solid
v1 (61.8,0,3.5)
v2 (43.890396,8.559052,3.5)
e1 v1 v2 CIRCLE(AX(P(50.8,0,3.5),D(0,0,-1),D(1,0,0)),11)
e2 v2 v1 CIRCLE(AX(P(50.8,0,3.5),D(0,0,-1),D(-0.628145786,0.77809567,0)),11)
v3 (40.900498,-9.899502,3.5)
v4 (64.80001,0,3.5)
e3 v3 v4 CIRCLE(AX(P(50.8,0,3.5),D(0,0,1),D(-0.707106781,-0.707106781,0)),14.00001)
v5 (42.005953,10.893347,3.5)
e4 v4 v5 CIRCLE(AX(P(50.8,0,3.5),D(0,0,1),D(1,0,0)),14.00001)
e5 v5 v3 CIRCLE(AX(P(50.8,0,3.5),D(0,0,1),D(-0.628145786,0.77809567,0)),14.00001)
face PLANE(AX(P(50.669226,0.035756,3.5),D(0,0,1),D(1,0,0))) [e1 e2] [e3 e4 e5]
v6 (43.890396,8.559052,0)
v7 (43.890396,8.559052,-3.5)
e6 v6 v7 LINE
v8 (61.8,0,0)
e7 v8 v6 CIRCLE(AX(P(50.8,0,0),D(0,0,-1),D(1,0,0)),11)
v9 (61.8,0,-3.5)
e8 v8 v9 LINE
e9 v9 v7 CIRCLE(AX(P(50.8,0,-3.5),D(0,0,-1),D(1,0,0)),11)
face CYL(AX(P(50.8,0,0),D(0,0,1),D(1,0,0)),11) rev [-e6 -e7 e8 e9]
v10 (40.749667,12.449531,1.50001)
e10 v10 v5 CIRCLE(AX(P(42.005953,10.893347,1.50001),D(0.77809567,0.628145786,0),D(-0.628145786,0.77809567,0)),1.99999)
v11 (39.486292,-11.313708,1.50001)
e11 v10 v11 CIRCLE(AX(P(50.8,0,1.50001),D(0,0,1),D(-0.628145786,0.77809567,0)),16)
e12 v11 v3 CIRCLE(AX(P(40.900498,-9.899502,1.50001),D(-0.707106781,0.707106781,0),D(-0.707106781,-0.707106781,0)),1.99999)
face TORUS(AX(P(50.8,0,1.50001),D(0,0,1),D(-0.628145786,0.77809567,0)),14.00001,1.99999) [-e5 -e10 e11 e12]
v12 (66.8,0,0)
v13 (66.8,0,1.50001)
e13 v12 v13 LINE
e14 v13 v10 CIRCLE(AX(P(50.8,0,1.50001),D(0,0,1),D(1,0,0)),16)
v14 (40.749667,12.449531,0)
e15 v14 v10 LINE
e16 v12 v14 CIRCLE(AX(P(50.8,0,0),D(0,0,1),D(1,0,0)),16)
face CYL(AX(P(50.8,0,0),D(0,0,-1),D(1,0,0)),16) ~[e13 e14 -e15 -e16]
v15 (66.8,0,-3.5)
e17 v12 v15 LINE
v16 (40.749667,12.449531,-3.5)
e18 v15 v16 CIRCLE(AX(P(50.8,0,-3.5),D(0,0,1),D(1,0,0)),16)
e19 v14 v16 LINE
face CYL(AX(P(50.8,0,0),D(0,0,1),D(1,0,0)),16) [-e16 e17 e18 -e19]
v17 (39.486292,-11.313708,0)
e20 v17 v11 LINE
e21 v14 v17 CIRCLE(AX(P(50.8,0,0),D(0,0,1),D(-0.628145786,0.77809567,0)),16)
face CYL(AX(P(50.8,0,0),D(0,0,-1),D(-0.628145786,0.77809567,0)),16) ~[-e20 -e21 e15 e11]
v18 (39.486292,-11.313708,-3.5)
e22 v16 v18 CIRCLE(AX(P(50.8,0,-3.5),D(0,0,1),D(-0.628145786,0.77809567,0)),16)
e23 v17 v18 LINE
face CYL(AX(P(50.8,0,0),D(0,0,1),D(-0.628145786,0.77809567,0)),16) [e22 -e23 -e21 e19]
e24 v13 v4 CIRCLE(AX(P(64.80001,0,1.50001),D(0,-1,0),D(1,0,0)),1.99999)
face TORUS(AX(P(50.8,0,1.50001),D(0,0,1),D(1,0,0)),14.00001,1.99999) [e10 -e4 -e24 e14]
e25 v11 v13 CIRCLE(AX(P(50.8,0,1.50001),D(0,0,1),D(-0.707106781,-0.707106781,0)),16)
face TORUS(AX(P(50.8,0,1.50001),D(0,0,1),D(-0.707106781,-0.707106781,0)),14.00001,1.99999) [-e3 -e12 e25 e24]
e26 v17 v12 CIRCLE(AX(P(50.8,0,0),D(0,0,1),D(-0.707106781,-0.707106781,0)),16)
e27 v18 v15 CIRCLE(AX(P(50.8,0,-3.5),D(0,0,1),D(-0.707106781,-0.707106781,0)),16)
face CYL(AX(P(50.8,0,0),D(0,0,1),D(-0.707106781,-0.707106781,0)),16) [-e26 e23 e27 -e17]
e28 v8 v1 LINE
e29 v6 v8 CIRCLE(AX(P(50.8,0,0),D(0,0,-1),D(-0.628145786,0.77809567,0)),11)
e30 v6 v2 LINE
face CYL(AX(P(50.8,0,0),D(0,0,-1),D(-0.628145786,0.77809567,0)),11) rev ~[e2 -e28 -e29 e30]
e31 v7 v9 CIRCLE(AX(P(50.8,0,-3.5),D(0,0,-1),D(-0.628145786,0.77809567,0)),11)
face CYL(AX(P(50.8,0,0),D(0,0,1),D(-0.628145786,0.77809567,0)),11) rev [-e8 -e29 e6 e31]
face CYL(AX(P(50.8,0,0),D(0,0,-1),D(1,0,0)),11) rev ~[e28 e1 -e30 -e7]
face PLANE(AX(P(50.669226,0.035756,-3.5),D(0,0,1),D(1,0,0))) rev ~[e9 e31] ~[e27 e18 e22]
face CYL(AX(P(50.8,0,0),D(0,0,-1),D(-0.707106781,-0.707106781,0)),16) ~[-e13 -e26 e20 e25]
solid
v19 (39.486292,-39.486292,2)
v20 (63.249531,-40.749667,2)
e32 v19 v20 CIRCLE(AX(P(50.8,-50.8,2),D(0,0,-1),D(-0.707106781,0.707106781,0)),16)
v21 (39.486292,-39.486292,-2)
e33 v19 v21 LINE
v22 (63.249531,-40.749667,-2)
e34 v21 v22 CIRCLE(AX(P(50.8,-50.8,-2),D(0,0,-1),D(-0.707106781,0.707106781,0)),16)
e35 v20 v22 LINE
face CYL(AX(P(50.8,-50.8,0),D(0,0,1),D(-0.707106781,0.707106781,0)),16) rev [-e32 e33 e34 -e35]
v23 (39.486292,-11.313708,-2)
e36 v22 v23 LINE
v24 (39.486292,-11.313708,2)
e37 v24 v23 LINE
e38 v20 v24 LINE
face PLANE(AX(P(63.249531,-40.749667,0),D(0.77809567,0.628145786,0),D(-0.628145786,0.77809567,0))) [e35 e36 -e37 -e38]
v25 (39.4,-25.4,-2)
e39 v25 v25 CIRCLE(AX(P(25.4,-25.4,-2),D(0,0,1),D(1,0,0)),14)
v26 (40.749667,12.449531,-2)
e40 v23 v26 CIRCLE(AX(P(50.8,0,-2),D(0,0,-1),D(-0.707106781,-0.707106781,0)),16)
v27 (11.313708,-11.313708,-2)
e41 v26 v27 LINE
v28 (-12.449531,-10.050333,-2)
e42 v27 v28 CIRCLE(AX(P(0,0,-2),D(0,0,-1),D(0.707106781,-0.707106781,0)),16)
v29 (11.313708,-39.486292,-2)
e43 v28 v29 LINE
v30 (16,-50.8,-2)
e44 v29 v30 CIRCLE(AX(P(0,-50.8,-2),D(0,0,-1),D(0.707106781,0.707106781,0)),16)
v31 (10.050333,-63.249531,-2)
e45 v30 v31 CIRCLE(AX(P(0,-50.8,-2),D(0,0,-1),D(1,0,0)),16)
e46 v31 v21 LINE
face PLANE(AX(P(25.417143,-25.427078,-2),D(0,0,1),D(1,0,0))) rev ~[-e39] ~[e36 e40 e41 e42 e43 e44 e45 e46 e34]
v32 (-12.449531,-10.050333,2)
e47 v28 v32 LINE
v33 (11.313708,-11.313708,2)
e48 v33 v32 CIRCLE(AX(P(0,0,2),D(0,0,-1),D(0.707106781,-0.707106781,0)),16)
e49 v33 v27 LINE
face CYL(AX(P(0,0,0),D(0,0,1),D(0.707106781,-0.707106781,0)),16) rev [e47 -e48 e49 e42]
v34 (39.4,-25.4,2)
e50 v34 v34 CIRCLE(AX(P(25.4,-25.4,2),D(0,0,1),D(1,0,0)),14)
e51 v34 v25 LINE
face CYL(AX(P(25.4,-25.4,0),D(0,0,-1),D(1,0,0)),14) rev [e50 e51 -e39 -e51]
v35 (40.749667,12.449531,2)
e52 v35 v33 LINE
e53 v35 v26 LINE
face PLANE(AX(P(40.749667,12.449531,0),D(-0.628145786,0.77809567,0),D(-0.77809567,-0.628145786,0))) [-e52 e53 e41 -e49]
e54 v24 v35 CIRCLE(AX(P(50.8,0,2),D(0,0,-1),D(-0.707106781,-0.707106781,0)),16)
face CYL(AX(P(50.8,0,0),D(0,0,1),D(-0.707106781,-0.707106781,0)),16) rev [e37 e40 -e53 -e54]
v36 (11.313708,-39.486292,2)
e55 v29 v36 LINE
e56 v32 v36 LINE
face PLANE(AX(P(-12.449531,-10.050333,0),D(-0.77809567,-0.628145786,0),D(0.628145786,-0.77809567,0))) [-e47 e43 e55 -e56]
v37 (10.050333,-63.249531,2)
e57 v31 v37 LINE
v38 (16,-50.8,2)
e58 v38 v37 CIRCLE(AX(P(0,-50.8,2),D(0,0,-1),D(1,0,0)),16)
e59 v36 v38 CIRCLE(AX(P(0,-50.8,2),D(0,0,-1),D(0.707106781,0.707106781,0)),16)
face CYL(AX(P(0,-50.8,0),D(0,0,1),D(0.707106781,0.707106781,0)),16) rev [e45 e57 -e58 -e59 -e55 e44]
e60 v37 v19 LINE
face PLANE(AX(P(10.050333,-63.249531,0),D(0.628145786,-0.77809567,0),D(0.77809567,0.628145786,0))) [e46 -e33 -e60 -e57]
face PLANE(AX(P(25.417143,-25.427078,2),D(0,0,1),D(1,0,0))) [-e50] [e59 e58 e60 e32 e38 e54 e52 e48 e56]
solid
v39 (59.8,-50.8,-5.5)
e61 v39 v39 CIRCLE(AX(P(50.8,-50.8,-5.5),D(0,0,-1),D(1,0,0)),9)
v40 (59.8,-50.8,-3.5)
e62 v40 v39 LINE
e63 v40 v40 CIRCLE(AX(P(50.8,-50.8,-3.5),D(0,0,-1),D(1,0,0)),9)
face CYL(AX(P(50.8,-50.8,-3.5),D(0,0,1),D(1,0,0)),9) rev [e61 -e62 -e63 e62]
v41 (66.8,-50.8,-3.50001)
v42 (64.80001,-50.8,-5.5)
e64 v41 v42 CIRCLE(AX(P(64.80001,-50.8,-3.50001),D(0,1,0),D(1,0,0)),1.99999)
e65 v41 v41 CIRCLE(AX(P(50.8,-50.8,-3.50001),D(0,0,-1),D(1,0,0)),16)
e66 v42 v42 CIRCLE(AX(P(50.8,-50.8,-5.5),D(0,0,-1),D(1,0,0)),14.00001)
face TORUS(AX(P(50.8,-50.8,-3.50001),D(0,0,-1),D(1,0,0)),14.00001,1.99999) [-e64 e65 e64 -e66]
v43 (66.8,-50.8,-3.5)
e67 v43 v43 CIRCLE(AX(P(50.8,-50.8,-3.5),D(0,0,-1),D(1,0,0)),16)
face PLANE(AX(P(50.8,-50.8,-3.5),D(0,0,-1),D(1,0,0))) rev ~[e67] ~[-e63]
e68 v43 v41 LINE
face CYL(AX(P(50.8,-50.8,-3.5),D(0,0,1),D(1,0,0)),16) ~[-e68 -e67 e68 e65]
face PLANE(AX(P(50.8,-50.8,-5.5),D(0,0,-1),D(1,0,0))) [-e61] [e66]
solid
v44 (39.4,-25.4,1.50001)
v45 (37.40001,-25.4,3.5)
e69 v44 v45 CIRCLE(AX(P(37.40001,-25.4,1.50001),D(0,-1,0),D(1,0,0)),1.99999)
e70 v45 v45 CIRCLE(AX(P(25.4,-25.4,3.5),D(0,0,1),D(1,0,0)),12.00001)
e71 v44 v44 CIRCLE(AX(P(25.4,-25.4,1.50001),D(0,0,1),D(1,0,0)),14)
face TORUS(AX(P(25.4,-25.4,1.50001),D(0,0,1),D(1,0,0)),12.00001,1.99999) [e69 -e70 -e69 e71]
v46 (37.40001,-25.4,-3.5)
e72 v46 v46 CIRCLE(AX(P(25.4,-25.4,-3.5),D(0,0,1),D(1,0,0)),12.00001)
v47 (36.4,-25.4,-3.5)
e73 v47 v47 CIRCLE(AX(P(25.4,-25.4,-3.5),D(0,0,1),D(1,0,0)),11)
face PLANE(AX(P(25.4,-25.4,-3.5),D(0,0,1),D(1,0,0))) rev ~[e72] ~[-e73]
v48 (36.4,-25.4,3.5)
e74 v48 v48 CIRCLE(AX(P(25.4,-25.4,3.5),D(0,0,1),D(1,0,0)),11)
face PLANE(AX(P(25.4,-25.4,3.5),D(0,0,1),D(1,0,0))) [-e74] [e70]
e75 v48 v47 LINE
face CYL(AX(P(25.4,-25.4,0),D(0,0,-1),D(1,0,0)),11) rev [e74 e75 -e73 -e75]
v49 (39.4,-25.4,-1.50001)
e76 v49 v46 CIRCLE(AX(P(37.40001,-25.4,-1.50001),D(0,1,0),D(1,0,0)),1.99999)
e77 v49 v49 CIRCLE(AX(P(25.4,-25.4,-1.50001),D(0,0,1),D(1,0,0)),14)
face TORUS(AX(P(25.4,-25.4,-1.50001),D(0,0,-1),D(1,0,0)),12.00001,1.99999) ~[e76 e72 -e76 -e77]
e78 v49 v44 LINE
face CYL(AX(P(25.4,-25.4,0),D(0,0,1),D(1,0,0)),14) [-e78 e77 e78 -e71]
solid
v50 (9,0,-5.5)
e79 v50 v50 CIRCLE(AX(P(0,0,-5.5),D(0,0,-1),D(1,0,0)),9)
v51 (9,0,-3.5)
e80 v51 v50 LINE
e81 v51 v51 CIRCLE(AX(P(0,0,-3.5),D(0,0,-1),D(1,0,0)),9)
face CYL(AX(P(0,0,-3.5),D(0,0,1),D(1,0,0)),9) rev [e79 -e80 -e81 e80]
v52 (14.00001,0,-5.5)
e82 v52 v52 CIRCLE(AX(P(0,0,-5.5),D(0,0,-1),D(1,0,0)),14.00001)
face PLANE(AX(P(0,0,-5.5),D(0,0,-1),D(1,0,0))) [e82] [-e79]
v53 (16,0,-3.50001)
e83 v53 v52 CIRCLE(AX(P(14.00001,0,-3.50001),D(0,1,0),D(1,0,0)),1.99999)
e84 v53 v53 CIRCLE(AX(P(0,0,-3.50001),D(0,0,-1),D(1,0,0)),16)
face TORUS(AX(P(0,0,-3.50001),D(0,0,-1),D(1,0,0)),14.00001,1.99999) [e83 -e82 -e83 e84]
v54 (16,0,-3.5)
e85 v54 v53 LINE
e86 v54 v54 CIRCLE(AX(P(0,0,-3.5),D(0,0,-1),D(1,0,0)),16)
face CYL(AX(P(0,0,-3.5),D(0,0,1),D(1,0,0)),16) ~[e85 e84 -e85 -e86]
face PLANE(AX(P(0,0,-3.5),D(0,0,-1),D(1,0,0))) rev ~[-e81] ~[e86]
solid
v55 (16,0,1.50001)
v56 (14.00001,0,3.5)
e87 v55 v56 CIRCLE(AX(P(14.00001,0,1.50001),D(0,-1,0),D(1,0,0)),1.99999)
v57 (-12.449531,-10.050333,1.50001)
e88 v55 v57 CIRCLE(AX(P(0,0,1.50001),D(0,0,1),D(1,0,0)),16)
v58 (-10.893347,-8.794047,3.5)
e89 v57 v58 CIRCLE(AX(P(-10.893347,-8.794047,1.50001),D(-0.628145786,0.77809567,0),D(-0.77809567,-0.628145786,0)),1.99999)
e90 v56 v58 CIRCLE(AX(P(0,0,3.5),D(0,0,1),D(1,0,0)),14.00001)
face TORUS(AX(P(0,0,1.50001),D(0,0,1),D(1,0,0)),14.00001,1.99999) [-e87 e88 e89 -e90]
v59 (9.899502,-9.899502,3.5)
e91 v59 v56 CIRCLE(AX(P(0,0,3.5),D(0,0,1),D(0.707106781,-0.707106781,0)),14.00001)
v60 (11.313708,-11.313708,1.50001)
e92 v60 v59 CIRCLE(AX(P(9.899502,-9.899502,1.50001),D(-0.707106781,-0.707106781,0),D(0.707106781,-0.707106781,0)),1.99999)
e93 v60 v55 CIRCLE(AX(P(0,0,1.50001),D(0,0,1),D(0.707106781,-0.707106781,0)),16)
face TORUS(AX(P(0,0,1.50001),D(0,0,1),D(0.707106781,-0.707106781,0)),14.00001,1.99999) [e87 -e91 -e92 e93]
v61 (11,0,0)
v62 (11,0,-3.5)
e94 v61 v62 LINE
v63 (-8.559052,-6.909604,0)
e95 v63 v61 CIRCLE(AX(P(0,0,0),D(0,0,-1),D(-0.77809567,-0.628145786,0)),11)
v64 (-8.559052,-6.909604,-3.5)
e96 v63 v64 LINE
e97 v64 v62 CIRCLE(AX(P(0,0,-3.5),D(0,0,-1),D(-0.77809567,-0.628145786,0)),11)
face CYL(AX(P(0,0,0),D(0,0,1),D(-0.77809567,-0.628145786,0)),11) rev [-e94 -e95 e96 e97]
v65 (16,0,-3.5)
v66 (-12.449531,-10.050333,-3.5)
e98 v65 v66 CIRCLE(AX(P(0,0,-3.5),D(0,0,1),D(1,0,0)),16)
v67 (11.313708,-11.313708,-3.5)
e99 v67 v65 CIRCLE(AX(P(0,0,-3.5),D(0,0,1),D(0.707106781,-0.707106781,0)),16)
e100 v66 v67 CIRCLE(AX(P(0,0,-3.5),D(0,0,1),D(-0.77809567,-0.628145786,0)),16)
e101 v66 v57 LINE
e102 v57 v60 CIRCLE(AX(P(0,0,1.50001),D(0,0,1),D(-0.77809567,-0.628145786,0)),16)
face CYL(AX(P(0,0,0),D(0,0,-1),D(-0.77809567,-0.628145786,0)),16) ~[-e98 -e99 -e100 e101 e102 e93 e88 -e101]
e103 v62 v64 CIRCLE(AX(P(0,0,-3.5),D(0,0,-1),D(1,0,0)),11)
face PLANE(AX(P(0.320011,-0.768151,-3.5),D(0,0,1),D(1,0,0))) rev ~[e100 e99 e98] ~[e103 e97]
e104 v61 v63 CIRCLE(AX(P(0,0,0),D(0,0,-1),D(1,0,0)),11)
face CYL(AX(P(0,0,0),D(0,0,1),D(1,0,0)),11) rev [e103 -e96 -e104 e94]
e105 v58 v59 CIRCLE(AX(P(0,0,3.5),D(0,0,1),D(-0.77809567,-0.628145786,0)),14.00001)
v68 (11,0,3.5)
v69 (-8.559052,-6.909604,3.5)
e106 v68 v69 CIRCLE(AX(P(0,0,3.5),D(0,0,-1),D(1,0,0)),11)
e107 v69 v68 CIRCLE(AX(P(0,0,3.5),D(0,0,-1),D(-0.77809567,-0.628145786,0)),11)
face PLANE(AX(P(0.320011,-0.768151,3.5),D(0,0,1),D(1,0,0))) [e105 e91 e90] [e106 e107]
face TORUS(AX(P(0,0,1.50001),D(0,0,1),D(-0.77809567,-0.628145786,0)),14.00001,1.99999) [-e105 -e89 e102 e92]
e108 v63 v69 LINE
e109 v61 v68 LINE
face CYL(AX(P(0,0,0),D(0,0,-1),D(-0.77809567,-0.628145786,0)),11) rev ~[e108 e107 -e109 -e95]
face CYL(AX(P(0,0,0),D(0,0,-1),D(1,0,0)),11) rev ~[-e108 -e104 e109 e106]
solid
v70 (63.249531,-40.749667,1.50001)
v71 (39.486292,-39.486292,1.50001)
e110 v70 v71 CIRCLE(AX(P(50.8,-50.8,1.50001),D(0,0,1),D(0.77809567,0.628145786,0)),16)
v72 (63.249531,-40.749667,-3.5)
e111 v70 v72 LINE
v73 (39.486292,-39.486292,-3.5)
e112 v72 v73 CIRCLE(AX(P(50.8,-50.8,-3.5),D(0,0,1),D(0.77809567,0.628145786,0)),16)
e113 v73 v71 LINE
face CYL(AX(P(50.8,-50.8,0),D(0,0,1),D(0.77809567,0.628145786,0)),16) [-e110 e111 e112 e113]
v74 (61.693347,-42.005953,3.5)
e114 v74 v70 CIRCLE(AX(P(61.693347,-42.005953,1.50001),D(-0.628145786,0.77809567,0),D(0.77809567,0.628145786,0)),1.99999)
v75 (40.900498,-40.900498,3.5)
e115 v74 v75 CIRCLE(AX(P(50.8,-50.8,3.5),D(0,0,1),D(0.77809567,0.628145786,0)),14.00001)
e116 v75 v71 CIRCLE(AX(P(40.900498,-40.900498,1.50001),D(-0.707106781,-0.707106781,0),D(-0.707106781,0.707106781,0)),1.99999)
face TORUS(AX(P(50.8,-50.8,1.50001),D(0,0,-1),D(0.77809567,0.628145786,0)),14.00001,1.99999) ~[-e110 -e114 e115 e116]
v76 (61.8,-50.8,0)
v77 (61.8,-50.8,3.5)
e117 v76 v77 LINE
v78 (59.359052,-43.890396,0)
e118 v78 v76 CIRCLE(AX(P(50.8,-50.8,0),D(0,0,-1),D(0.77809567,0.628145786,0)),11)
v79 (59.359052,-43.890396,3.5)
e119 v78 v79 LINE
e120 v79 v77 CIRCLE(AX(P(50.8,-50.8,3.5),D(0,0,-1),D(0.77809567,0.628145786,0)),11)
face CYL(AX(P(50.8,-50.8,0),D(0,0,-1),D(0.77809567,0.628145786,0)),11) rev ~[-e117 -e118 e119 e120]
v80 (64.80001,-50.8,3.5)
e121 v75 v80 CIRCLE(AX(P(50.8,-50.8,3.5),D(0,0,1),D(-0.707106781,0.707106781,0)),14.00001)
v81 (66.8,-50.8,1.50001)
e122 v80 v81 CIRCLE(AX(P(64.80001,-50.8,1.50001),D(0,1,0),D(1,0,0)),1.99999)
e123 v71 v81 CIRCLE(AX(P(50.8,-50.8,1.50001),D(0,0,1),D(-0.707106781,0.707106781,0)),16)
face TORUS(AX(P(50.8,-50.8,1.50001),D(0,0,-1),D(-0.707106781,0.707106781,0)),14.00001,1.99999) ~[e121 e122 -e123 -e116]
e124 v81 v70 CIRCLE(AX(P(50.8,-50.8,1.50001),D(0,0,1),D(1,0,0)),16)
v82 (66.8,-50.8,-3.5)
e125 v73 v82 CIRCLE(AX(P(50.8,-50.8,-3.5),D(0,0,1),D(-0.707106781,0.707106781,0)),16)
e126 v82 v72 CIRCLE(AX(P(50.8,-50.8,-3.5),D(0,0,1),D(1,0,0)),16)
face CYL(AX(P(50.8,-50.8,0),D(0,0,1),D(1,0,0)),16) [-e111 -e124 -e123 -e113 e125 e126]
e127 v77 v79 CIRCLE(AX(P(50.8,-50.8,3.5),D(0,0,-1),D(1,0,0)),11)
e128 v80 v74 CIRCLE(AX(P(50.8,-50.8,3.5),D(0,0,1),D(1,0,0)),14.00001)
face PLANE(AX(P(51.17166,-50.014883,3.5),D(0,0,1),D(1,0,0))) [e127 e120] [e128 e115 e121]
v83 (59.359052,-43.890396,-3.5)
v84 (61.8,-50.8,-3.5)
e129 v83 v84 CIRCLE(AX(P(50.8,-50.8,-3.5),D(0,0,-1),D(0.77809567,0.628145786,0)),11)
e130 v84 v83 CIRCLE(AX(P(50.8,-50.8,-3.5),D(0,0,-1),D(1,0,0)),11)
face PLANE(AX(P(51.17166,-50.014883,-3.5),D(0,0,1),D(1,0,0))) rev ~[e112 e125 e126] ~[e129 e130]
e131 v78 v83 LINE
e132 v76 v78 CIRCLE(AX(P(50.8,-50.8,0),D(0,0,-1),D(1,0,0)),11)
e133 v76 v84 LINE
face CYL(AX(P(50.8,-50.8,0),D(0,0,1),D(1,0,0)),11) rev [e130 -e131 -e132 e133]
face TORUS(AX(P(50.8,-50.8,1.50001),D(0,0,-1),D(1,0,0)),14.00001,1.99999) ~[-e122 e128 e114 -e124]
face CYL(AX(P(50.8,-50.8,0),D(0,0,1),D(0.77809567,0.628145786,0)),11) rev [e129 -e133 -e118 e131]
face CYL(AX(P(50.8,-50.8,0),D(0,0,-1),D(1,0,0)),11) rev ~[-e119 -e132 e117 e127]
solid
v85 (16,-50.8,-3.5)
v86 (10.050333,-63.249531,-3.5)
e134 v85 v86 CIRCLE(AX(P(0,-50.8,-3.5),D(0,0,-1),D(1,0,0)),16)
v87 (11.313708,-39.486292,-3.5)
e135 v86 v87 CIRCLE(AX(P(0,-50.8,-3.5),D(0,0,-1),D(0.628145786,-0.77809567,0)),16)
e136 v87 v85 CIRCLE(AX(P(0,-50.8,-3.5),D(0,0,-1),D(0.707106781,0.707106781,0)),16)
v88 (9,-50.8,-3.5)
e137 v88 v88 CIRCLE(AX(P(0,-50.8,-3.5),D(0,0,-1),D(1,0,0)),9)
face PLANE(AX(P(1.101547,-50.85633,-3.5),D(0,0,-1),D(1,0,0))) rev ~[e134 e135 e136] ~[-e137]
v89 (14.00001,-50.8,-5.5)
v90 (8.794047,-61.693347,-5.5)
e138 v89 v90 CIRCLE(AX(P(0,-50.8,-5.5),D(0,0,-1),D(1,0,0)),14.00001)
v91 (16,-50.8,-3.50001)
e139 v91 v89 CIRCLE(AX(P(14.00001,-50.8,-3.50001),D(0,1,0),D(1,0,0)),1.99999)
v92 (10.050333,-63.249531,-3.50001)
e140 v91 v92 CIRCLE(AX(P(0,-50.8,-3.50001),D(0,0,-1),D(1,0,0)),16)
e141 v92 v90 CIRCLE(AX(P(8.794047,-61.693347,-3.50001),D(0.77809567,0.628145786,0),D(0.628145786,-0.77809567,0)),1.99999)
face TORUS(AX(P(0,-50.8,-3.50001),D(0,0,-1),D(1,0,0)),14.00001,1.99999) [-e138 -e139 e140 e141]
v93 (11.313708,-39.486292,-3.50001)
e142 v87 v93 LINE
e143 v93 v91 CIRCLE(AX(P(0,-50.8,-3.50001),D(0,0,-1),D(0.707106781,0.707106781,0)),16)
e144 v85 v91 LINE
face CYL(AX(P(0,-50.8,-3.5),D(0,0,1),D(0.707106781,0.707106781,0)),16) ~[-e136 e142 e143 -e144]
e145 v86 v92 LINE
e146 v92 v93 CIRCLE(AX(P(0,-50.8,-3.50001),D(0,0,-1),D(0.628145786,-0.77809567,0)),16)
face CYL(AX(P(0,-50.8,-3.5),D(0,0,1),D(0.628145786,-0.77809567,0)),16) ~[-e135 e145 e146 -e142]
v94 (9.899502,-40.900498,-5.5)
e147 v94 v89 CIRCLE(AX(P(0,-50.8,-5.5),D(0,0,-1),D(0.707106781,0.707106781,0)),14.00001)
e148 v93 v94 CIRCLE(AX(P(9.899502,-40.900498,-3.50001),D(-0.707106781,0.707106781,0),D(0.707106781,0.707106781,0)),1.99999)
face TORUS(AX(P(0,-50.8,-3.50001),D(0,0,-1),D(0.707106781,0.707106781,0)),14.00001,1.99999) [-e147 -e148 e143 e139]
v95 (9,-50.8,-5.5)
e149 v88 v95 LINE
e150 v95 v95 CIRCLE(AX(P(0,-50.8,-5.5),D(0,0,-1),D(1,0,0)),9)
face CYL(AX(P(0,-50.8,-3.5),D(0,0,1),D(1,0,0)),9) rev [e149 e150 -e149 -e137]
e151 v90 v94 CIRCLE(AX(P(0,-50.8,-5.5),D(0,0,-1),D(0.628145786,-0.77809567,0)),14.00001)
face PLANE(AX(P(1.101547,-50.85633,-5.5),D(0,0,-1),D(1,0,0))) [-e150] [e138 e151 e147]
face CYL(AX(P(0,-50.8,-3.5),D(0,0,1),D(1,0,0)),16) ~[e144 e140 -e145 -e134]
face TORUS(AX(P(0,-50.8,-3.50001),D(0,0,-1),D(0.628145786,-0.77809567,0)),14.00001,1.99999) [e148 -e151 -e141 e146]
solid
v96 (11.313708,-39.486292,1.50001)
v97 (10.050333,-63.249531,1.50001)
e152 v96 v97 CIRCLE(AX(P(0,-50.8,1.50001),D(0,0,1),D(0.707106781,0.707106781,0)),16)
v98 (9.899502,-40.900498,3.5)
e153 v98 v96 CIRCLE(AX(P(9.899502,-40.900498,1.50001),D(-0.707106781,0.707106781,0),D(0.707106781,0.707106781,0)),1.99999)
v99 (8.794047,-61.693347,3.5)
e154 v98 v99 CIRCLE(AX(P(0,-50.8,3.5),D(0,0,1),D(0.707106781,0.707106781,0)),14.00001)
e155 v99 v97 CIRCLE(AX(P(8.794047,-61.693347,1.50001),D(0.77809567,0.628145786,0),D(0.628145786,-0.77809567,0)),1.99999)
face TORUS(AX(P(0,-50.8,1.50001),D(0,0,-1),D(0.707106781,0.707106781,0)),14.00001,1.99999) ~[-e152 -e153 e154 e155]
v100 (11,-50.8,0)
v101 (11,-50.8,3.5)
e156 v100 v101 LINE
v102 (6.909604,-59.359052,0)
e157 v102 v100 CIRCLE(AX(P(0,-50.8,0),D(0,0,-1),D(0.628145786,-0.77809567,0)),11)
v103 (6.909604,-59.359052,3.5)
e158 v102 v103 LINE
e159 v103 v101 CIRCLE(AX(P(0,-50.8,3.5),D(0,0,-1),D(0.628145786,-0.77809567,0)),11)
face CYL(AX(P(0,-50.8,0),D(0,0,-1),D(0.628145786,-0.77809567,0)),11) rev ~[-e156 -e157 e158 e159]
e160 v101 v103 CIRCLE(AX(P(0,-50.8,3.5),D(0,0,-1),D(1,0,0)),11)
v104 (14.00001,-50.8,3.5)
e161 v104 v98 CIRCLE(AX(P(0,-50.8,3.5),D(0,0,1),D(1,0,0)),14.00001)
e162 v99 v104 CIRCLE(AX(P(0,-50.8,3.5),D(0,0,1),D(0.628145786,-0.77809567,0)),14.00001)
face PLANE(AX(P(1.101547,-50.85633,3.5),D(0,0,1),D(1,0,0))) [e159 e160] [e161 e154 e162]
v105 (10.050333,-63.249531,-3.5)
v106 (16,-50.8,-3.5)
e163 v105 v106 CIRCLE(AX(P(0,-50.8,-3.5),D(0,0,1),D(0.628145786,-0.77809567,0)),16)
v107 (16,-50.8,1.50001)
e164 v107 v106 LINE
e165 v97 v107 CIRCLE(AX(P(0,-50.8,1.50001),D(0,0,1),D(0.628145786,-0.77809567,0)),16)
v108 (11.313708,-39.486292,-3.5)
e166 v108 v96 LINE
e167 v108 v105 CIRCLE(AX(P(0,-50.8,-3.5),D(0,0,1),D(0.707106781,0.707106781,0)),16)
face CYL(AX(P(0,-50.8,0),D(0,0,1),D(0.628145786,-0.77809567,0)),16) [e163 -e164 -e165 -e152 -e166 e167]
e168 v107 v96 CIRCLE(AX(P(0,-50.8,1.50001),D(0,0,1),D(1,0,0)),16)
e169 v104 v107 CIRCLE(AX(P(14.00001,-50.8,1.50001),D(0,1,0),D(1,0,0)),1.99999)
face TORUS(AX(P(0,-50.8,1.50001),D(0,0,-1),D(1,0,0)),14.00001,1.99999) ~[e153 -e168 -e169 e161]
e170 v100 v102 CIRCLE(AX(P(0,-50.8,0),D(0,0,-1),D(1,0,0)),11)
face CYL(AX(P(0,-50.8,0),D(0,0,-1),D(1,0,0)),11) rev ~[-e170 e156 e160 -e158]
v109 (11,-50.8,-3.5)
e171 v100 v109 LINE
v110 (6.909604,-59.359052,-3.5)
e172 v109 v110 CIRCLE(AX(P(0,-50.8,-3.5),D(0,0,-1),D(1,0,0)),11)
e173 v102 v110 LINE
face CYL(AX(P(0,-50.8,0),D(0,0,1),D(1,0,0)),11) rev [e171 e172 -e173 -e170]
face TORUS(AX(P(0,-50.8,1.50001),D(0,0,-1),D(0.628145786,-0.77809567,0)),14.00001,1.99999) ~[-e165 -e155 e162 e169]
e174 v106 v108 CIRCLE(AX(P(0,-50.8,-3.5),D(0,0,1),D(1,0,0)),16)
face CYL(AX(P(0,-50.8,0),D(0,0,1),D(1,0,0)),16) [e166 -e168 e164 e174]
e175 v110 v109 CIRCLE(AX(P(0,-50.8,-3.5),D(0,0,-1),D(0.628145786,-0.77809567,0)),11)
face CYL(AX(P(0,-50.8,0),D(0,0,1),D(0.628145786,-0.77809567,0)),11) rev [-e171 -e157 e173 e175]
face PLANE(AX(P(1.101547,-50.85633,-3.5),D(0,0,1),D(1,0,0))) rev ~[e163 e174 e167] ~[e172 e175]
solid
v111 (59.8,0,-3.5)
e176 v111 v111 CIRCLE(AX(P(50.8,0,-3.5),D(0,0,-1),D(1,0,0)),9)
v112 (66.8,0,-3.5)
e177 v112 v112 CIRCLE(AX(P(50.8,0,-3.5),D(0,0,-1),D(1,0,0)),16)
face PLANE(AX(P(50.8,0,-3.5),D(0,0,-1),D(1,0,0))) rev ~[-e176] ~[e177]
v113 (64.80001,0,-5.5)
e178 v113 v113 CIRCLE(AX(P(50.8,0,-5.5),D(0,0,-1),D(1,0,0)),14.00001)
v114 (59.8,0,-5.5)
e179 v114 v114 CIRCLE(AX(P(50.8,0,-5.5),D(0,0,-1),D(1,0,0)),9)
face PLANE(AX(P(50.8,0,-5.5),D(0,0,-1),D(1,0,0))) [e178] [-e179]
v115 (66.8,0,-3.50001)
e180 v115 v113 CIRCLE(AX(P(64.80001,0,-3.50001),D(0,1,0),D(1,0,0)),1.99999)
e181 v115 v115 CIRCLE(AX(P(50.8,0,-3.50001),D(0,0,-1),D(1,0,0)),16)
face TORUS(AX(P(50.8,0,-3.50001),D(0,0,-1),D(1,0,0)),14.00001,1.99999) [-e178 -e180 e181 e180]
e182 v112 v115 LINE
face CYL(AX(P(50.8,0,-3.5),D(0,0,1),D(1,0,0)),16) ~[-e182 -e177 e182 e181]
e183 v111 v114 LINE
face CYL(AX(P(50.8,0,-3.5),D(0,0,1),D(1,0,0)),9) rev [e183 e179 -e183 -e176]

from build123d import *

# Parameters (mm, degrees)
F0_R     = 14
F1_DEPTH = 2
F2_DEPTH = 3.5
F3_R     = 9
F4_DEPTH = 2
F3_R_2   = 16
F0_R_2   = 11
F5_DEPTH = 3.5
F6_R     = 1.99999
F6_2_R   = 1.99999
F6_3_R   = 1.99999
F6_4_R   = 1.99999
F6_5_R   = 1.99999
F6_6_R   = 1.99999
F6_7_R   = 1.99999
F6_8_R   = 1.99999
F6_9_R   = 1.99999


# Not quite as in the source:
# - a fillet or chamfer is up to 0.001 mm smaller than in the source, because OpenCascade refuses the exact size


with BuildPart() as f1:
    # F0 (on Top) → F1 (new body, symmetric)
    with BuildSketch(Plane.XY):
        with BuildLine():
            ThreePointArc((11.313708499, -11.313708499), (-0.8494425911, -15.9774355666), (-12.4495307232, -10.0503325703))
            Line((-12.4495307232, -10.0503325703), (11.313708499, -39.486291501))
            ThreePointArc((11.313708499, -39.486291501), (14.7820725202, -44.6770650822), (16, -50.8))
            ThreePointArc((16, -50.8), (14.4361580956, -57.699082507), (10.0503325703, -63.2495307232))
            Line((10.0503325703, -63.2495307232), (39.486291501, -39.486291501))
            ThreePointArc((39.486291501, -39.486291501), (51.6494425911, -34.8225644334), (63.2495307232, -40.7496674297))
            Line((63.2495307232, -40.7496674297), (39.486291501, -11.313708499))
            ThreePointArc((39.486291501, -11.313708499), (34.8225644334, 0.8494425911), (40.7496674297, 12.4495307232))
            Line((40.7496674297, 12.4495307232), (11.313708499, -11.313708499))
        make_face()
        with Locations((25.4, -25.4)):
            Circle(F0_R, mode=Mode.SUBTRACT)
    extrude(amount=F1_DEPTH, both=True)


with BuildPart() as f2:
    # F0 (on Top) → F2 (new body, symmetric)
    with BuildSketch(Plane.XY):
        with BuildLine():
            ThreePointArc((16, -50.8), (14.7820725202, -44.6770650822), (11.313708499, -39.486291501))
            ThreePointArc((11.313708499, -39.486291501), (-15.9774355666, -49.9505574089), (10.0503325703, -63.2495307232))
            ThreePointArc((10.0503325703, -63.2495307232), (14.4361580956, -57.699082507), (16, -50.8))
        make_face()
        with BuildLine():
            ThreePointArc((11, -50.8), (9.9248586907, -55.5431192235), (6.909603642, -59.3590523722))
            ThreePointArc((6.909603642, -59.3590523722), (-9.9248586907, -46.0568807765), (11, -50.8))
        make_face(mode=Mode.SUBTRACT)
    extrude(amount=F2_DEPTH, both=True)

    # F6 (radius 2 in the source; OpenCascade refuses exactly that, so slightly less here)
    f6_edges = [f2.edges().sort_by_distance(p)[0] for p in [
        (-15.977436, -49.950557, 3.5),
    ]]
    fillet(f6_edges, radius=F6_R)


with BuildPart() as f2b:
    # F0 (on Top) → F2, piece 2 (new body, symmetric)
    with BuildSketch(Plane.XY):
        with BuildLine():
            ThreePointArc((63.2495307232, -40.7496674297), (51.6494425911, -34.8225644334), (39.486291501, -39.486291501))
            ThreePointArc((39.486291501, -39.486291501), (44.6770650822, -65.5820725202), (66.8, -50.8))
            ThreePointArc((66.8, -50.8), (65.8862933083, -45.4704827409), (63.2495307232, -40.7496674297))
        make_face()
        with BuildLine():
            ThreePointArc((61.8, -50.8), (40.4281733505, -54.4640431156), (59.3590523722, -43.890396358))
            ThreePointArc((59.3590523722, -43.890396358), (61.1718266495, -47.1359568844), (61.8, -50.8))
        make_face(mode=Mode.SUBTRACT)
    extrude(amount=F2_DEPTH, both=True)

    # F6#4 (radius 2 in the source; OpenCascade refuses exactly that, so slightly less here)
    f6_4_edges = [f2b.edges().sort_by_distance(p)[0] for p in [
        (44.677065, -65.582073, 3.5),
    ]]
    fillet(f6_4_edges, radius=F6_4_R)


with BuildPart() as f2c:
    # F0 (on Top) → F2, piece 3 (new body, symmetric)
    with BuildSketch(Plane.XY):
        with BuildLine():
            ThreePointArc((66.8, 0), (57.699082507, 14.4361580956), (40.7496674297, 12.4495307232))
            ThreePointArc((40.7496674297, 12.4495307232), (34.8225644334, 0.8494425911), (39.486291501, -11.313708499))
            ThreePointArc((39.486291501, -11.313708499), (56.9229349178, -14.7820725202), (66.8, 0))
        make_face()
        with BuildLine():
            ThreePointArc((61.8, 0), (46.0568807765, -9.9248586907), (43.890396358, 8.5590523722))
            ThreePointArc((43.890396358, 8.5590523722), (55.5431192235, 9.9248586907), (61.8, 0))
        make_face(mode=Mode.SUBTRACT)
    extrude(amount=F2_DEPTH, both=True)

    # F6#6 (radius 2 in the source; OpenCascade refuses exactly that, so slightly less here)
    f6_6_edges = [f2c.edges().sort_by_distance(p)[0] for p in [
        (34.822564, 0.849443, 3.5),
    ]]
    fillet(f6_6_edges, radius=F6_6_R)


with BuildPart() as f2d:
    # F0 (on Top) → F2, piece 4 (new body, symmetric)
    with BuildSketch(Plane.XY):
        with BuildLine():
            ThreePointArc((16, 0), (-5.3295172591, 15.0862933083), (-12.4495307232, -10.0503325703))
            ThreePointArc((-12.4495307232, -10.0503325703), (-0.8494425911, -15.9774355666), (11.313708499, -11.313708499))
            ThreePointArc((11.313708499, -11.313708499), (14.7820725202, -6.1229349178), (16, 0))
        make_face()
        with BuildLine():
            ThreePointArc((-8.5590523722, -6.909603642), (-3.6640431156, 10.3718266495), (11, 0))
            ThreePointArc((11, 0), (3.6640431156, -10.3718266495), (-8.5590523722, -6.909603642))
        make_face(mode=Mode.SUBTRACT)
    extrude(amount=F2_DEPTH, both=True)

    # F6#8 (radius 2 in the source; OpenCascade refuses exactly that, so slightly less here)
    f6_8_edges = [f2d.edges().sort_by_distance(p)[0] for p in [
        (-5.329517, 15.086293, 3.5),
    ]]
    fillet(f6_8_edges, radius=F6_8_R)


with BuildPart() as f4:
    # F3 (on face) → F4 (new body)
    with BuildSketch(Plane(origin=(0, 0, -3.5), x_dir=(1, 0, 0), z_dir=(0, 0, -1))):
        with BuildLine():
            ThreePointArc((11.313708499, 39.486291501), (14.7820725202, 44.6770650822), (16, 50.8))
            ThreePointArc((16, 50.8), (14.4361580956, 57.699082507), (10.0503325703, 63.2495307232))
            ThreePointArc((10.0503325703, 63.2495307232), (-15.9774355666, 49.9505574089), (11.313708499, 39.486291501))
        make_face()
        with BuildLine():
            ThreePointArc((11, 50.8), (-9.9248586907, 46.0568807765), (6.909603642, 59.3590523722))
            ThreePointArc((6.909603642, 59.3590523722), (9.9248586907, 55.5431192235), (11, 50.8))
        make_face(mode=Mode.SUBTRACT)
        with BuildLine():
            ThreePointArc((11, 50.8), (9.9248586907, 55.5431192235), (6.909603642, 59.3590523722))
            ThreePointArc((6.909603642, 59.3590523722), (-9.9248586907, 46.0568807765), (11, 50.8))
        make_face()
        with Locations((0, 50.8)):
            Circle(F3_R, mode=Mode.SUBTRACT)
    extrude(amount=F4_DEPTH)

    # F6#2 (radius 2 in the source; OpenCascade refuses exactly that, so slightly less here)
    f6_2_edges = [f4.edges().sort_by_distance(p)[0] for p in [
        (-16, -50.8, -5.5),
    ]]
    fillet(f6_2_edges, radius=F6_2_R)


with BuildPart() as f4b:
    # F3 (on face) → F4, piece 2 (new body)
    with BuildSketch(Plane(origin=(0, 0, -3.5), x_dir=(1, 0, 0), z_dir=(0, 0, -1))):
        with Locations((50.8, 50.8)):
            Circle(F3_R_2)
        with Locations((50.8, 50.8)):
            Circle(F3_R, mode=Mode.SUBTRACT)
    extrude(amount=F4_DEPTH)

    # F6#3 (radius 2 in the source; OpenCascade refuses exactly that, so slightly less here)
    f6_3_edges = [f4b.edges().sort_by_distance(p)[0] for p in [
        (34.8, -50.8, -5.5),
    ]]
    fillet(f6_3_edges, radius=F6_3_R)


with BuildPart() as f4c:
    # F3 (on face) → F4, piece 3 (new body)
    with BuildSketch(Plane(origin=(0, 0, -3.5), x_dir=(1, 0, 0), z_dir=(0, 0, -1))):
        with Locations((50.8, 0)):
            Circle(F3_R_2)
        with Locations((50.8, 0)):
            Circle(F3_R, mode=Mode.SUBTRACT)
    extrude(amount=F4_DEPTH)

    # F6#5 (radius 2 in the source; OpenCascade refuses exactly that, so slightly less here)
    f6_5_edges = [f4c.edges().sort_by_distance(p)[0] for p in [
        (34.8, 0, -5.5),
    ]]
    fillet(f6_5_edges, radius=F6_5_R)


with BuildPart() as f4d:
    # F3 (on face) → F4, piece 4 (new body)
    with BuildSketch(Plane(origin=(0, 0, -3.5), x_dir=(1, 0, 0), z_dir=(0, 0, -1))):
        Circle(F3_R_2)
        Circle(F3_R, mode=Mode.SUBTRACT)
    extrude(amount=F4_DEPTH)

    # F6#7 (radius 2 in the source; OpenCascade refuses exactly that, so slightly less here)
    f6_7_edges = [f4d.edges().sort_by_distance(p)[0] for p in [
        (-16, 0, -5.5),
    ]]
    fillet(f6_7_edges, radius=F6_7_R)


with BuildPart() as f5:
    # F0 (on Top) → F5 (new body, symmetric)
    with BuildSketch(Plane.XY):
        with Locations((25.4, -25.4)):
            Circle(F0_R)
        with Locations((25.4, -25.4)):
            Circle(F0_R_2, mode=Mode.SUBTRACT)
    extrude(amount=F5_DEPTH, both=True)

    # F6#9 (radius 2 in the source; OpenCascade refuses exactly that, so slightly less here)
    f6_9_edges = [f5.edges().sort_by_distance(p)[0] for p in [
        (11.4, -25.4, 3.5),
        (11.4, -25.4, -3.5),
    ]]
    fillet(f6_9_edges, radius=F6_9_R)


solid = Compound([f1.part, f2.part, f2b.part, f2c.part, f2d.part, f4.part, f4b.part, f4c.part, f4d.part, f5.part])
